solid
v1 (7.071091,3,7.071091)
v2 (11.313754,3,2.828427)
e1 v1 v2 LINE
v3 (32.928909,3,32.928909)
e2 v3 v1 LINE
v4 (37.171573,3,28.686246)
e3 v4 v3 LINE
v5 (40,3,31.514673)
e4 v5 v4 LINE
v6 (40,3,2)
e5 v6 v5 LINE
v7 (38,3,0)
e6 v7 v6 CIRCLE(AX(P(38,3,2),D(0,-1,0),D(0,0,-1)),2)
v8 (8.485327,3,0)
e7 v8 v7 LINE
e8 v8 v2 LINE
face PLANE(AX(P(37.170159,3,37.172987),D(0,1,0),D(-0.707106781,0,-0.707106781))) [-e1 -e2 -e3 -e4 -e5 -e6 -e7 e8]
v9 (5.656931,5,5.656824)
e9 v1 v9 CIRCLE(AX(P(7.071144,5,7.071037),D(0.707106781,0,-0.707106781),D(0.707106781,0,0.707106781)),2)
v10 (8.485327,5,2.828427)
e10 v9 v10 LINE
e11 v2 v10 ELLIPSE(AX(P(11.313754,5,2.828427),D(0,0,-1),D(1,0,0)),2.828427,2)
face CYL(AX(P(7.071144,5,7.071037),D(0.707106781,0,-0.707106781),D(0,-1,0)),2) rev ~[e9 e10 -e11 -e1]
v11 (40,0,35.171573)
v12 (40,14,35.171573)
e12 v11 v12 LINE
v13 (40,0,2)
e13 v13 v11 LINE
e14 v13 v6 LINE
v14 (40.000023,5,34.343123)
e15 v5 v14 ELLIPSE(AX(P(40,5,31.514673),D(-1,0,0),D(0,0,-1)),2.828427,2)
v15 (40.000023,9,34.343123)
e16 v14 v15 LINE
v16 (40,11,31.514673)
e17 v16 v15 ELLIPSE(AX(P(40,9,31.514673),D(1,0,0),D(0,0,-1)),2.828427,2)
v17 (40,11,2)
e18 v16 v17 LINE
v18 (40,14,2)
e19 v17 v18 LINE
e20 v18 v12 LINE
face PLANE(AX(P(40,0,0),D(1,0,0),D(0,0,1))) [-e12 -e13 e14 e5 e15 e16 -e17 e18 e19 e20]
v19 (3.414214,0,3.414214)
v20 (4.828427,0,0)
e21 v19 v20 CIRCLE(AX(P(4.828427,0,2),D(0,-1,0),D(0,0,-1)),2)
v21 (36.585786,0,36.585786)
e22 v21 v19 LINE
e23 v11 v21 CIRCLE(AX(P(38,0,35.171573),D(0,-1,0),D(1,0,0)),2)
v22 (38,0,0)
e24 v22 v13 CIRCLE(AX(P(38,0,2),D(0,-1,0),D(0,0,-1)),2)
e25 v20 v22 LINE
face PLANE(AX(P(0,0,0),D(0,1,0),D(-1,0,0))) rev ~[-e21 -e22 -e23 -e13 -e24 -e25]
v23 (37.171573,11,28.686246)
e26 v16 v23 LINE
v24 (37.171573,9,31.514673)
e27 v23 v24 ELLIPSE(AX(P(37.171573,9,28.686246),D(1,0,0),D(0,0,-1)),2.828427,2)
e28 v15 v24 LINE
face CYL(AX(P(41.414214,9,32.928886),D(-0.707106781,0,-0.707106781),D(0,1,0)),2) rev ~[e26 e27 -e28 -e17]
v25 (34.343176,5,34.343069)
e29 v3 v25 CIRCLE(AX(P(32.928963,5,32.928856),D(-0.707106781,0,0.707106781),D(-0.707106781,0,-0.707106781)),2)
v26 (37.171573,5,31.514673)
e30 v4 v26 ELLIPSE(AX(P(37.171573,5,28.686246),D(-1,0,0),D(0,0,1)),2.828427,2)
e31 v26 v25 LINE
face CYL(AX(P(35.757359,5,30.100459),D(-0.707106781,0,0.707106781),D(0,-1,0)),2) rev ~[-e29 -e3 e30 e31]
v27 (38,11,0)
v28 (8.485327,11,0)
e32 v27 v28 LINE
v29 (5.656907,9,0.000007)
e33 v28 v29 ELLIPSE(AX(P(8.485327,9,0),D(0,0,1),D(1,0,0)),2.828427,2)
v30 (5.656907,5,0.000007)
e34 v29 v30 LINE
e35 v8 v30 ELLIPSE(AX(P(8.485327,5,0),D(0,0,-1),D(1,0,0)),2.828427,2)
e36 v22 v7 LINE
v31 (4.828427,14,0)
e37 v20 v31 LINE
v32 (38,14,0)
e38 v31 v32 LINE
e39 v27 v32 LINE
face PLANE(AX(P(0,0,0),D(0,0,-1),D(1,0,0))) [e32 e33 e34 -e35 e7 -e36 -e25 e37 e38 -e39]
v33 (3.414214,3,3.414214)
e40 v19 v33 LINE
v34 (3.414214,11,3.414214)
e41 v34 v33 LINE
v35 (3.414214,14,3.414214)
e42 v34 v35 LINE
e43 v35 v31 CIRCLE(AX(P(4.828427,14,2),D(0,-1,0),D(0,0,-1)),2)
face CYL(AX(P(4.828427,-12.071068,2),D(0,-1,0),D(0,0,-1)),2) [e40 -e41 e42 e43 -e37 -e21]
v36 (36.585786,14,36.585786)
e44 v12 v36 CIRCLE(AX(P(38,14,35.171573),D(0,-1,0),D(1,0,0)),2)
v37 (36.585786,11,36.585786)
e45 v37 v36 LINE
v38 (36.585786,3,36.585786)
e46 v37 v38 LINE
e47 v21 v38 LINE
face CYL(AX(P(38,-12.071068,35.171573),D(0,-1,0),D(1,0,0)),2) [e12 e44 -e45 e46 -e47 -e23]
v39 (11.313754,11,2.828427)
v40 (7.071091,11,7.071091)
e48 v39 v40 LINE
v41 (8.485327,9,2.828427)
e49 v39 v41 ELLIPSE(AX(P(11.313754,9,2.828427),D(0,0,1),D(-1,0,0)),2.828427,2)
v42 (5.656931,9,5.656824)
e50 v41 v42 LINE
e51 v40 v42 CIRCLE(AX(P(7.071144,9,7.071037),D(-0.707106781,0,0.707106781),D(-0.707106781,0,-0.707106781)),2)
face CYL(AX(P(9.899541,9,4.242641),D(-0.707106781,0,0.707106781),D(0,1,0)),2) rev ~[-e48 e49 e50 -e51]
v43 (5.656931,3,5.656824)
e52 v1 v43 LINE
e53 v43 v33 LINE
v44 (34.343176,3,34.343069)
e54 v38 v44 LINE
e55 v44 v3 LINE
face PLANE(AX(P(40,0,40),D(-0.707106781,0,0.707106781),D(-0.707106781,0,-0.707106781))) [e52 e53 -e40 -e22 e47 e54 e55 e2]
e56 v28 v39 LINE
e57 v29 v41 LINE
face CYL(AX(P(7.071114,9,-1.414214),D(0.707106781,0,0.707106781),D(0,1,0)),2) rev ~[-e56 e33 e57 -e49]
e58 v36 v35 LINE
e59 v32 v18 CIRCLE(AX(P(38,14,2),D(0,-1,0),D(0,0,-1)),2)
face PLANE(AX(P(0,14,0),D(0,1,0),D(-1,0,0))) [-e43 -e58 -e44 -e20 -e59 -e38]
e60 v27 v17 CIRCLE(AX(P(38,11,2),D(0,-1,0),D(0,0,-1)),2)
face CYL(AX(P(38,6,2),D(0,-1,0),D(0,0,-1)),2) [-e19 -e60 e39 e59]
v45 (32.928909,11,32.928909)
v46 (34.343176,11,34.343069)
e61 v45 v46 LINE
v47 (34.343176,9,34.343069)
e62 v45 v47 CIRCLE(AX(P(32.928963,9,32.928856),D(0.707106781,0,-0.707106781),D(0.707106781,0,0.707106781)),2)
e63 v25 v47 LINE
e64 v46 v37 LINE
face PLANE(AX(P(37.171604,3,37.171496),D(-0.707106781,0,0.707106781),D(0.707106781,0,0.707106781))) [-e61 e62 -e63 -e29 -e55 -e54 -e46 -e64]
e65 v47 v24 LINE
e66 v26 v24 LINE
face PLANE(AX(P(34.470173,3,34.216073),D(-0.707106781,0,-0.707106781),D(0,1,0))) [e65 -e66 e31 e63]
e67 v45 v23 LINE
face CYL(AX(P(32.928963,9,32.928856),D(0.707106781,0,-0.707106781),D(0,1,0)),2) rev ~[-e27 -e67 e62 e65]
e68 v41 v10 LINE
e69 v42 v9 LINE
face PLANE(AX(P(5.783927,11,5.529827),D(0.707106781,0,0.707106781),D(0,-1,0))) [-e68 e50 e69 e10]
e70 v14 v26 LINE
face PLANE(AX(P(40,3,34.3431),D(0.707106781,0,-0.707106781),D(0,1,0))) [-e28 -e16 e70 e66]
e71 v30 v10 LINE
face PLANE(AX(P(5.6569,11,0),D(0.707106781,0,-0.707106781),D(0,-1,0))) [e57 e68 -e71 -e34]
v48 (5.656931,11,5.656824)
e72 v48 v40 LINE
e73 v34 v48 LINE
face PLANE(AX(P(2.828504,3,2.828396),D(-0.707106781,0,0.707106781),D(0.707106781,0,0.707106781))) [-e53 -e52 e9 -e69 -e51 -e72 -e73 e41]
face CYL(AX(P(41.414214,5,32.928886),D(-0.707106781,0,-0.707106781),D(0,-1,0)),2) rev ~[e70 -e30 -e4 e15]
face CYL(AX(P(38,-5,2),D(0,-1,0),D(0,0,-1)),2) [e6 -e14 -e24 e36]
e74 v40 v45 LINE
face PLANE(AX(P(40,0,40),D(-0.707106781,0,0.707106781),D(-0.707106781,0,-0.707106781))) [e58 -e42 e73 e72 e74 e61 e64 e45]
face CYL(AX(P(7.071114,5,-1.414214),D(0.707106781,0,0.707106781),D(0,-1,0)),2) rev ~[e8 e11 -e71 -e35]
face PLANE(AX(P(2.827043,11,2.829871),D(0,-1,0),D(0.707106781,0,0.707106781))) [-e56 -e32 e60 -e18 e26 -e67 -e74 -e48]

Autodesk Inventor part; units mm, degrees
ref_plane "YZ Plane" through (0, 0, 0) normal (1, 0, 0) x (0, 1, 0)
ref_plane "XZ Plane" through (0, 0, 0) normal (0, 1, 0) x (-1, 0, 0)
ref_plane "XY Plane" through (0, 0, 0) normal (0, 0, 1) x (1, 0, 0)
sketch "Sketch1" plane through (0, 0, 0) normal (0, 1, 0) x (-1, 0, 0)
  line L0 (0, 0) -> (-40, 0)
  line L1 (-40, 0) -> (-40, 40)
  line L2 (-40, 40) -> (0, 0)
  dimension "d0" = 40
  dimension "d1" = 40
  dimension "d2" = 56.5685
extrude "Extrusion1" add sketch "Sketch1" along normal blind 14
sketch "Sketch2" plane through (40, 0, 40) normal (-0.7071068, 0, 0.7071068) x (0.7071068, 0, 0.7071068)
  line L0 (-56.5685, 0) -> (-56.5685, 14) construction
  line L1 (-56.5685, 7) -> (0, 7) construction
  line L2 (0, 0) -> (0, 14) construction
  line L3 (-52.5685, 11) -> (-4, 11)
  line L4 (-4, 11) -> (-4, 3)
  line L5 (-4, 3) -> (-52.5685, 3)
  line L6 (-52.5685, 3) -> (-52.5685, 11)
  line L7 (-52.5685, 11) -> (-4, 3) construction
  line L8 (-4, 11) -> (-52.5685, 3) construction
  point P0 (-28.2843, 7)
  dimension "d5" = 4
  dimension "d6" = 4
  dimension "d20" = 8
extrude "Extrusion2" cut sketch "Sketch2" against normal blind 28.75
fillet "Fillet1" radius 2 4 edges at (40, 12.5, 0) (40, 1.5, 0) (40, 7, 40) (0, 7, 0)
sketch "Sketch4" plane through (5.6569, 3, 0) normal (0.7071068, 0, 0.7071068) x (0.7071068, 0, -0.7071068)
  line L0 (-3.8204, 0) -> (-3.8204, 8) projected
  line L1 (-3.8204, 0) -> (0, 0) projected
  line L2 (0, 8) -> (0, 0) projected
  line L3 (-3.8204, 8) -> (0, 8) projected
  point P0 (-4, -3)
extrude "Extrusion3" add sketch "Sketch4" along normal blind 4
sketch "Sketch5" plane through (40, 3, 34.3431) normal (-0.7071068, 0, -0.7071068) x (-0.7071068, 0, 0.7071068)
  line L0 (3.8204, 8) -> (3.8204, 0) projected
  line L1 (3.8204, 8) -> (0, 8) projected
  line L2 (0, 0) -> (0, 8) projected
  line L3 (3.8204, 0) -> (0, 0) projected
  point P0 (4, -3)
extrude "Extrusion4" add sketch "Sketch5" along normal blind 4
sketch "Sketch6" plane through (37.2986, 3, 37.0445) normal (-0.7071068, 0, 0.7071068) x (0.7071068, 0, 0.7071068)
  line L0 (0, 8) -> (0, 0) projected
  line L1 (-4, 8) -> (0, 8) projected
  line L2 (-4, 0) -> (-4, 8) projected
  line L3 (0, 0) -> (-4, 0) projected
  point P0 (-52.5685, -3)
extrude "Extrusion5" add sketch "Sketch6" along normal up to surface (0.1796 mm away)
sketch "Sketch7" plane through (2.9555, 3, 2.7014) normal (-0.7071068, 0, 0.7071068) x (0.7071068, 0, 0.7071068)
  line L0 (0, 0) -> (0, 8) projected
  line L1 (4, 0) -> (0, 0) projected
  line L2 (4, 8) -> (4, 0) projected
  line L3 (0, 8) -> (4, 8) projected
  point P0 (-4, -3)
extrude "Extrusion6" add sketch "Sketch7" along normal up to surface (0.1796 mm away)
fillet "Fillet2" radius 2 2 edges at (37.1716, 7, 37.1716) (2.8284, 7, 2.8284)
fillet "Fillet3" radius 2 8 edges at (7.0711, 11, 4.2426) (7.0711, 3, 4.2426) (35.7574, 3, 32.9289) (35.7574, 11, 32.9289) (7.0711, 11, 1.4142) (7.0711, 3, 1.4142) (38.5858, 3, 32.9289) (38.5858, 11, 32.9289)
properties part number "table-corners"
